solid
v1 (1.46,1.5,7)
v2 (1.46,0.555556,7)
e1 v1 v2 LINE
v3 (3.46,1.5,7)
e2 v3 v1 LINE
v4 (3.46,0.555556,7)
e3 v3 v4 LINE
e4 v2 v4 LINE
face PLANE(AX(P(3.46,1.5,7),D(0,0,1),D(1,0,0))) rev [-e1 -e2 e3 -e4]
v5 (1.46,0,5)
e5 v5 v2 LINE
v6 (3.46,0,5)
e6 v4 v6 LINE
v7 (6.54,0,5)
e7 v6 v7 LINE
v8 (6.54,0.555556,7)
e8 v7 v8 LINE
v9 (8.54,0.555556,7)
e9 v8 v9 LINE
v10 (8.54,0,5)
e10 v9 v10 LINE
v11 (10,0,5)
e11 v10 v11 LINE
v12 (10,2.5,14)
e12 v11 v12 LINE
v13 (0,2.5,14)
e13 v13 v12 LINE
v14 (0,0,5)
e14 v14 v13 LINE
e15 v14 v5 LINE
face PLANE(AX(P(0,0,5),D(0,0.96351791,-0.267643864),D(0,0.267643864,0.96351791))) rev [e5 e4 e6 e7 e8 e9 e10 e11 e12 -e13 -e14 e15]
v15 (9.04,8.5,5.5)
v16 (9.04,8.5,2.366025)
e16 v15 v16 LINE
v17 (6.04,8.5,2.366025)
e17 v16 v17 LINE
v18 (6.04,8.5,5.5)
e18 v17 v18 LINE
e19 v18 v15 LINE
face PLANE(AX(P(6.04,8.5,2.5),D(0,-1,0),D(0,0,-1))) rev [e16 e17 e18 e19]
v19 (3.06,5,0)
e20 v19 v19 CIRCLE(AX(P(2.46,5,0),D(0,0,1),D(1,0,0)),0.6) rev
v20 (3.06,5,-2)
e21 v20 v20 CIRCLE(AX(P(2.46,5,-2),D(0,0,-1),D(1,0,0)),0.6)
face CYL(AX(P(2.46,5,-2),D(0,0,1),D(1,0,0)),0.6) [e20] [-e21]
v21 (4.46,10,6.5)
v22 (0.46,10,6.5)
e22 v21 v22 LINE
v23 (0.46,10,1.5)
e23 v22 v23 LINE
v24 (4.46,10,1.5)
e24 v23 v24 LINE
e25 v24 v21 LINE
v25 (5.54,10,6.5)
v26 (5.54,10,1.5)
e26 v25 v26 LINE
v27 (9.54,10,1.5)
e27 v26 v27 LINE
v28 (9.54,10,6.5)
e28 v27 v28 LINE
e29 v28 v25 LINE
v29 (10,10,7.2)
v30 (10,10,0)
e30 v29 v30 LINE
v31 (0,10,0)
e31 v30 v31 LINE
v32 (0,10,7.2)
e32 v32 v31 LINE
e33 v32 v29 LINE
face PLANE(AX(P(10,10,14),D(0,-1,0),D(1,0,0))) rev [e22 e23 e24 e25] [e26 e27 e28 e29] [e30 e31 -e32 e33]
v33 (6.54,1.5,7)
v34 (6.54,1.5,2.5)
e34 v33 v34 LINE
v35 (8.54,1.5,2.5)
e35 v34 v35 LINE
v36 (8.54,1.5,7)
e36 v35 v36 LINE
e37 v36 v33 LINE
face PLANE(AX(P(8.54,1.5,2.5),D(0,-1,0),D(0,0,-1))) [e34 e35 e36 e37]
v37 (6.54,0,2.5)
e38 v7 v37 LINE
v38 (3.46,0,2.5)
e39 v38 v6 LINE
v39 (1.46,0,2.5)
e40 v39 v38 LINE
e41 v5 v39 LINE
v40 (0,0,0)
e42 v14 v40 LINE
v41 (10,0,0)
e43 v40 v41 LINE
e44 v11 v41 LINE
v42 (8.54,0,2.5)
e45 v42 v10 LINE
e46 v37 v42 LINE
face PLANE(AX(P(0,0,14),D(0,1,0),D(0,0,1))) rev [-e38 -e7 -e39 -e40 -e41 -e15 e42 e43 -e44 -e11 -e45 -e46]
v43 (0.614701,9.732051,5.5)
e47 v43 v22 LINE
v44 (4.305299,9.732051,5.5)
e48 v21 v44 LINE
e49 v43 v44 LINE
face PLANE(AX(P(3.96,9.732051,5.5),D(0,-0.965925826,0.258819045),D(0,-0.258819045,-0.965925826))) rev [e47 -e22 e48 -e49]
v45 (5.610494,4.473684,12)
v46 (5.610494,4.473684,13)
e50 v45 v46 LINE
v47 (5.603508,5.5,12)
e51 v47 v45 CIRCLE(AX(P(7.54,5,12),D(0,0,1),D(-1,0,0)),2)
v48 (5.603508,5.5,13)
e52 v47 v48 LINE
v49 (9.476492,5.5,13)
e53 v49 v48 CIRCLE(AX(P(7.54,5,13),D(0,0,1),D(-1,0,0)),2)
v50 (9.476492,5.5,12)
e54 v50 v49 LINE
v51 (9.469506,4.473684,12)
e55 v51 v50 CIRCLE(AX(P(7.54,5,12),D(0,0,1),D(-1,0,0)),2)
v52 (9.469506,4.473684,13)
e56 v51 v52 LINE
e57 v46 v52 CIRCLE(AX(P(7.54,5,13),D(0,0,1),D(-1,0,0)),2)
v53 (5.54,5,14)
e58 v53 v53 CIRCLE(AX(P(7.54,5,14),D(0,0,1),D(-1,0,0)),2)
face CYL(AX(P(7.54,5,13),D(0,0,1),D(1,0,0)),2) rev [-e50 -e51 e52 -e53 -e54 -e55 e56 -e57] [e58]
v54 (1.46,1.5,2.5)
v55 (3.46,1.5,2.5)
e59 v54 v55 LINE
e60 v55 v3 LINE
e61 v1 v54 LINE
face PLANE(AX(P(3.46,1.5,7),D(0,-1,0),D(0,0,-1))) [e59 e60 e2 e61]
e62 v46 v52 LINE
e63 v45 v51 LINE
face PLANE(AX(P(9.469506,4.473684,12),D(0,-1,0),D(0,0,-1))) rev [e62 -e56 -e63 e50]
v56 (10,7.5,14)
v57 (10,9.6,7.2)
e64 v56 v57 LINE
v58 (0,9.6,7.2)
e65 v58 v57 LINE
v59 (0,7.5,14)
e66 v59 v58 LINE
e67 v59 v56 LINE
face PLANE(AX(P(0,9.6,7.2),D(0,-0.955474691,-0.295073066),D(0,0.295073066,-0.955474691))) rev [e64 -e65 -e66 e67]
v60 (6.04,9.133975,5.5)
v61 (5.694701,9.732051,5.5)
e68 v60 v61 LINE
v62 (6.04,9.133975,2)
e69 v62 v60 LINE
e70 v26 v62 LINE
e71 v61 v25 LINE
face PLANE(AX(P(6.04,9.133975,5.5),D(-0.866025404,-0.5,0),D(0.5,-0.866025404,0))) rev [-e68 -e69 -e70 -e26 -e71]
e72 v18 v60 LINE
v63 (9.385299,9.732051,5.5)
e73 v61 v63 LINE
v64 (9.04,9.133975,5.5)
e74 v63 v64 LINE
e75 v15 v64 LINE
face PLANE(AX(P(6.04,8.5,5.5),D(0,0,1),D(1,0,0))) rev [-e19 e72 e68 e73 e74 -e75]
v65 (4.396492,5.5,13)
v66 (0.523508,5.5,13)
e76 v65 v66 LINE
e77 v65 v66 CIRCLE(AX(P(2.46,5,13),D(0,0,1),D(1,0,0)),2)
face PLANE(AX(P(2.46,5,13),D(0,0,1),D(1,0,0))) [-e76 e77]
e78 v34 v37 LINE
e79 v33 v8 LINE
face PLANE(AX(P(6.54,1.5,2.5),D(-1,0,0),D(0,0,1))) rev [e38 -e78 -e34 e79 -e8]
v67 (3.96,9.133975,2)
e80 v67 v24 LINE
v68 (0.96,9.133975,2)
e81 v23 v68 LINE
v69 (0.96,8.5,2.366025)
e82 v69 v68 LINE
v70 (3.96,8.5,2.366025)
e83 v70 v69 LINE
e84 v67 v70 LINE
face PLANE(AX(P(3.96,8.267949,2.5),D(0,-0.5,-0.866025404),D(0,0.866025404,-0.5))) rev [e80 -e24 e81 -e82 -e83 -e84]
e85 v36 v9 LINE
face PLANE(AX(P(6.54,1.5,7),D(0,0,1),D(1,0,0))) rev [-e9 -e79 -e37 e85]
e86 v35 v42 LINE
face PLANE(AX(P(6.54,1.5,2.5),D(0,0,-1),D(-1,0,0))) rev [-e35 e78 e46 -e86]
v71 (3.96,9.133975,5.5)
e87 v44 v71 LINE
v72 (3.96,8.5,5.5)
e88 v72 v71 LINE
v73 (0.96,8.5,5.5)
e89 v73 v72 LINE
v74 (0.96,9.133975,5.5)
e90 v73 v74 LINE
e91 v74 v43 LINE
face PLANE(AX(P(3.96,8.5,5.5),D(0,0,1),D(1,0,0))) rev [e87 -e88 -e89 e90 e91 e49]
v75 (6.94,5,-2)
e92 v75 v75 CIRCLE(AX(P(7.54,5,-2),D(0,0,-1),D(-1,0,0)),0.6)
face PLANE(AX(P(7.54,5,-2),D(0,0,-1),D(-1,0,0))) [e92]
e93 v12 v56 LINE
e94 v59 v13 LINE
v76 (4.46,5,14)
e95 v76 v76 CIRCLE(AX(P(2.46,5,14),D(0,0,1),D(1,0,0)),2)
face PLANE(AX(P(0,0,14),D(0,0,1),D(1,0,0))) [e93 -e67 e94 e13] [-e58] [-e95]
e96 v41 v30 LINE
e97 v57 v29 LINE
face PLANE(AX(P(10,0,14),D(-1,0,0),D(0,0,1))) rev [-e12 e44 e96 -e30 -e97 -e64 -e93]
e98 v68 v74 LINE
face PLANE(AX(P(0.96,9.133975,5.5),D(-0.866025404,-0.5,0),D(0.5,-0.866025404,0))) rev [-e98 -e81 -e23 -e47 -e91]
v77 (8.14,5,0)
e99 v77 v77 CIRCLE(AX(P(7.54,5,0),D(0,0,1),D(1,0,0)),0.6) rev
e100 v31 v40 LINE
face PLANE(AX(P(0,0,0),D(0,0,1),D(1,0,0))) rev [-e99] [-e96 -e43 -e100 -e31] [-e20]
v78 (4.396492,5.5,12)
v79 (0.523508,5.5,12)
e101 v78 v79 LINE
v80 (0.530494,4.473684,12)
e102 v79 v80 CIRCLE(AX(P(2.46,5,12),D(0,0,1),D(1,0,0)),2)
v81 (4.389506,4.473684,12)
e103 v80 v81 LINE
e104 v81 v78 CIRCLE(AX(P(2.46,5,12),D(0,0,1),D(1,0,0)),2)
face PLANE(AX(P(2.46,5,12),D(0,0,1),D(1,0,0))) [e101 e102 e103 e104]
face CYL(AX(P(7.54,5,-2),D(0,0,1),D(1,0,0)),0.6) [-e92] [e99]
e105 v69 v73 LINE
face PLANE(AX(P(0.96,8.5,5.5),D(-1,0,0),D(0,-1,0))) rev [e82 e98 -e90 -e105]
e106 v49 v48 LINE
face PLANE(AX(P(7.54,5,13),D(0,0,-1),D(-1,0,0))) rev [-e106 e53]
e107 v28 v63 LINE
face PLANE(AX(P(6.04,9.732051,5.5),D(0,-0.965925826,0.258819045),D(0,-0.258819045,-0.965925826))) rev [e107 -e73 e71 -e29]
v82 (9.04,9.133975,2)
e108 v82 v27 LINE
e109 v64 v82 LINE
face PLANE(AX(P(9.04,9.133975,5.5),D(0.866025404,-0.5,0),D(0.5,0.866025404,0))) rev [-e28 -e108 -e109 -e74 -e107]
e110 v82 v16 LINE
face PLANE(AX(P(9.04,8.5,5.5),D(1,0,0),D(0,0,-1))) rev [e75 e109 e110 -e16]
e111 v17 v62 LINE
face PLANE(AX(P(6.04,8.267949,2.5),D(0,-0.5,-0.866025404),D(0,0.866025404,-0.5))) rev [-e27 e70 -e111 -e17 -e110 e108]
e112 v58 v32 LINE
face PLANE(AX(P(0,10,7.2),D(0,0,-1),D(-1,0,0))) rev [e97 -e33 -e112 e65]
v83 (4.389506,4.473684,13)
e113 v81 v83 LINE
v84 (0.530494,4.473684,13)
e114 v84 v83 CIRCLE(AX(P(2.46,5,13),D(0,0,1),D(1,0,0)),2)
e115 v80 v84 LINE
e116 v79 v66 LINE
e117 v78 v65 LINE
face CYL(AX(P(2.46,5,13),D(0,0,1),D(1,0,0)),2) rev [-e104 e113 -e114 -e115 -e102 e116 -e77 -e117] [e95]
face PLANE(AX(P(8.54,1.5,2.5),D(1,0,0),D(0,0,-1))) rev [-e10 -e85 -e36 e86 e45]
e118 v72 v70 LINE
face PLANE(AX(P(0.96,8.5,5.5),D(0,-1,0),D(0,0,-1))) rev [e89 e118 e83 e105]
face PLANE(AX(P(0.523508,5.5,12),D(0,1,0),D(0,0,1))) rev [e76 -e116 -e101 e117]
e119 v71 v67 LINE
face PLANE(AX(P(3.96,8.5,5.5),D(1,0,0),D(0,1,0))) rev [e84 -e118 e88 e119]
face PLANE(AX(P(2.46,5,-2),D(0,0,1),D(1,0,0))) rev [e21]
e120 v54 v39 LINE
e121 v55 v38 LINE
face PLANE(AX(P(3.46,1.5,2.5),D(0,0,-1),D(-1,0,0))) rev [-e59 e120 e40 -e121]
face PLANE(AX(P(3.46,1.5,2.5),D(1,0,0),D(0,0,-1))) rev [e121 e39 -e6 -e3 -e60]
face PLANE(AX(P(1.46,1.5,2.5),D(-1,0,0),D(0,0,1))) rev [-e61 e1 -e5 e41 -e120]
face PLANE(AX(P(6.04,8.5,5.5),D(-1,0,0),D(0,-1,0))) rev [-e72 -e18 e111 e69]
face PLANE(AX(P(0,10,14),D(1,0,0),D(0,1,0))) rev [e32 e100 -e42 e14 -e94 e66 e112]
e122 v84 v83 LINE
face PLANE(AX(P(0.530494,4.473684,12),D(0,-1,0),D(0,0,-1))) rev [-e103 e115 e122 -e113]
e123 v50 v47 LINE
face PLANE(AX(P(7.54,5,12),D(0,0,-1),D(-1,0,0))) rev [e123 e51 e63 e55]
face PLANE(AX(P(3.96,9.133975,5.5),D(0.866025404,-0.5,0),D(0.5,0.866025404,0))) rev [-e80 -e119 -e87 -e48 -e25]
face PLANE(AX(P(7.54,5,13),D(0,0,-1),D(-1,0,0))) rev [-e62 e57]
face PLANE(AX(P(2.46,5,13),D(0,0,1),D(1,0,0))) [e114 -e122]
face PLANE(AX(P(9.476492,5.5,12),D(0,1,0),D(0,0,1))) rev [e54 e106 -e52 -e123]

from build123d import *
from build123d.topology import SkipClean

# Parameters (mm, degrees)
SKETCH_1_W          = 10
SKETCH_1_H          = 10
EXTRUDE_1_DEPTH     = 14
CUT_EXTRUDE_1_DEPTH = 20.899748742
SKETCH_3_W          = 3
SKETCH_3_H          = 3
CUT_EXTRUDE_2_DEPTH = 1.5
CHAMFER_1_SIZE      = 1
CHAMFER_1_SIZE2     = 0.267949192
CHAMFER_2_SIZE      = 1
CHAMFER_2_SIZE_2    = 1.732050808
CHAMFER_3_SIZE      = 0.5
CHAMFER_3_SIZE_2    = 0.866025404
SKETCH_4_W          = 2
SKETCH_4_H          = 4.5
CUT_EXTRUDE_3_DEPTH = 1.5
SKETCH_5_R          = 2
CUT_EXTRUDE_4_DEPTH = 1
CUT_EXTRUDE_5_DEPTH = 1
SKETCH_7_R          = 0.6
EXTRUDE_2_DEPTH     = 2


with BuildPart() as part:
    # 草图1 → 凸台-拉伸1 (new body)
    with BuildSketch(Plane.XY):
        with Locations((5, 5)):
            Rectangle(SKETCH_1_W, SKETCH_1_H)
    extrude(amount=EXTRUDE_1_DEPTH)

    # 草图2 → 切除-拉伸1 (cut, through all)
    with BuildSketch(Plane(origin=(10, 0, 0), x_dir=(0, 0, -1), z_dir=(1, 0, 0))):
        Polygon((-14, 2.5), (-14, 0), (-5, 0), align=None)
        Polygon((-14, 7.5), (-14, 10), (-7.2, 10), (-7.2, 9.6), align=None)
    extrude(amount=-CUT_EXTRUDE_1_DEPTH, mode=Mode.SUBTRACT)

    # 草图3 → 切除-拉伸2 (cut)
    with BuildSketch(Plane(origin=(0, 10, 0), x_dir=(1, 0, 0), z_dir=(0, 1, 0))):
        with Locations((2.46, -4)):
            Rectangle(SKETCH_3_W, SKETCH_3_H)
        with Locations((7.54, -4)):
            Rectangle(SKETCH_3_W, SKETCH_3_H)
    extrude(amount=-CUT_EXTRUDE_2_DEPTH, mode=Mode.SUBTRACT)

    # 倒角1
    chamfer_1_edges = [part.edges().sort_by_distance(p)[0] for p in [
        (2.46, 10, 5.5),
        (7.54, 10, 5.5),
    ]]
    chamfer_1_side = [part.faces().sort_by_distance(p)[0] for p in [
        (5, 10, 3.466666667),
    ]]
    chamfer(chamfer_1_edges, length=CHAMFER_1_SIZE, length2=CHAMFER_1_SIZE2, reference=chamfer_1_side[0])

    # 倒角2
    # the kernel refuses this chamfer: 1.732050808, 1 mm, written as the material it takes off along each edge
    with BuildSketch(Plane(origin=(0.96, 10, 2.5), x_dir=(0, 0.057893862402671484, -0.9983227437537926), z_dir=(1, 0, 0))) as chamfer_2_piece_1_section:
        Polygon((CHAMFER_2_SIZE * 0.998322743754, -CHAMFER_2_SIZE * 0.0578938624027), (-CHAMFER_2_SIZE_2 * 0.0578938623883, -CHAMFER_2_SIZE_2 * 0.998322743505), (0, 0), align=None)
    chamfer_2_piece_1 = extrude(amount=3, mode=Mode.PRIVATE)
    chamfer_2_piece_1 = split(chamfer_2_piece_1, bisect_by=Plane(origin=(2.46, 8.5, 2.161390478), z_dir=(0, 1, 0)), keep=Keep.TOP, mode=Mode.PRIVATE)
    add(chamfer_2_piece_1, mode=Mode.SUBTRACT)
    with BuildSketch(Plane(origin=(-3.520963971, 10, 2.5), x_dir=(0, 0.057893862402671484, -0.9983227437537926), z_dir=(1, 0, 0))) as chamfer_2_piece_2_section:
        Polygon((CHAMFER_2_SIZE * 0.998322743754, -CHAMFER_2_SIZE * 0.0578938624027), (-CHAMFER_2_SIZE_2 * 0.0578938623883, -CHAMFER_2_SIZE_2 * 0.998322743505), (0, 0), align=None)
    chamfer_2_piece_2 = extrude(amount=11.961927941, mode=Mode.PRIVATE)
    chamfer_2_piece_2 = split(chamfer_2_piece_2, bisect_by=Plane(origin=(7.240481985, 8.5, 2.161390478), z_dir=(0, 1, 0)), keep=Keep.TOP, mode=Mode.PRIVATE)
    chamfer_2_piece_2 = split(chamfer_2_piece_2, bisect_by=Plane(origin=(6.04, 9.440926985, 2.161390478), z_dir=(1, 0, 0)), keep=Keep.TOP, mode=Mode.PRIVATE)
    add(chamfer_2_piece_2, mode=Mode.SUBTRACT)
    with BuildSketch(Plane(origin=(1.559036029, 10, 2.5), x_dir=(0, 0.05789386240267147, -0.9983227437537926), z_dir=(1, 0, 0))) as chamfer_2_piece_3_section:
        Polygon((CHAMFER_2_SIZE * 0.998322743754, -CHAMFER_2_SIZE * 0.0578938624027), (-CHAMFER_2_SIZE_2 * 0.0578938623883, -CHAMFER_2_SIZE_2 * 0.998322743505), (0, 0), align=None)
    chamfer_2_piece_3 = extrude(amount=11.961927941, mode=Mode.PRIVATE)
    chamfer_2_piece_3 = split(chamfer_2_piece_3, bisect_by=Plane(origin=(2.759518015, 8.5, 2.161390478), z_dir=(0, 1, 0)), keep=Keep.TOP, mode=Mode.PRIVATE)
    chamfer_2_piece_3 = split(chamfer_2_piece_3, bisect_by=Plane(origin=(3.96, 9.440926985, 2.161390478), z_dir=(-1, 0, 0)), keep=Keep.TOP, mode=Mode.PRIVATE)
    add(chamfer_2_piece_3, mode=Mode.SUBTRACT)
    with BuildSketch(Plane(origin=(6.04, 10, 2.5), x_dir=(0, 0.057893862402671484, -0.9983227437537926), z_dir=(1, 0, 0))) as chamfer_2_piece_4_section:
        Polygon((CHAMFER_2_SIZE * 0.998322743754, -CHAMFER_2_SIZE * 0.0578938624027), (-CHAMFER_2_SIZE_2 * 0.0578938623883, -CHAMFER_2_SIZE_2 * 0.998322743505), (0, 0), align=None)
    chamfer_2_piece_4 = extrude(amount=3, mode=Mode.PRIVATE)
    chamfer_2_piece_4 = split(chamfer_2_piece_4, bisect_by=Plane(origin=(7.54, 8.5, 2.161390478), z_dir=(0, 1, 0)), keep=Keep.TOP, mode=Mode.PRIVATE)
    add(chamfer_2_piece_4, mode=Mode.SUBTRACT)

    # 倒角3
    # the kernel refuses this chamfer: 0.866025404, 0.5 mm, written as the material it takes off along each edge
    with BuildSketch(Plane(origin=(0.96, 10, 8.740481985), x_dir=(-0.9983227437537926, 0.057893862402669756, 3.38732848352391e-15), z_dir=(0, 0, -1))) as chamfer_3_piece_1_section:
        Polygon((CHAMFER_3_SIZE * 0.998322743754, -CHAMFER_3_SIZE * 0.0578938624027), (-CHAMFER_3_SIZE_2 * 0.0578938623883, -CHAMFER_3_SIZE_2 * 0.998322743505), (0, 0), align=None)
    chamfer_3_piece_1 = extrude(amount=9.480963971, mode=Mode.PRIVATE)
    chamfer_3_piece_1 = split(chamfer_3_piece_1, bisect_by=Plane(origin=(0.892667554, 9.405329997, 5.5), z_dir=(0, 0, -1)), keep=Keep.TOP, mode=Mode.PRIVATE)
    chamfer_3_piece_1 = split(chamfer_3_piece_1, bisect_by=Plane(origin=(0.892667554, 9.55774733, 4.849490567), z_dir=(0, -0.9659258262890682, 0.25881904510252124)), keep=Keep.TOP, mode=Mode.PRIVATE)
    add(chamfer_3_piece_1, mode=Mode.SUBTRACT)
    with BuildSketch(Plane(origin=(0.96, 10, 8.740481985), x_dir=(-0.9983227437537926, 0.057893862402669756, 3.38732848352391e-15), z_dir=(0, 0, -1))) as chamfer_3_piece_2_section:
        Polygon((CHAMFER_3_SIZE * 0.998322743754, -CHAMFER_3_SIZE * 0.0578938624027), (-CHAMFER_3_SIZE_2 * 0.0578938623883, -CHAMFER_3_SIZE_2 * 0.998322743505), (0, 0), align=None)
    chamfer_3_piece_2 = extrude(amount=9.480963971, mode=Mode.PRIVATE)
    chamfer_3_piece_2 = split(chamfer_3_piece_2, bisect_by=Plane(origin=(0.727363304, 9.931547557, 5.5), z_dir=(0, 0, 1)), keep=Keep.TOP, mode=Mode.PRIVATE)
    chamfer_3_piece_2 = split(chamfer_3_piece_2, bisect_by=Plane(origin=(0.727363304, 9.838481056, 5.897203096), z_dir=(0, 0.9659258262890682, -0.25881904510252124)), keep=Keep.TOP, mode=Mode.PRIVATE)
    add(chamfer_3_piece_2, mode=Mode.SUBTRACT)
    with BuildSketch(Plane(origin=(0.96, 10, 8.740481985), x_dir=(-0.9983227437537926, 0.057893862402669756, 3.38732848352391e-15), z_dir=(0, 0, -1))) as chamfer_3_piece_3_section:
        Polygon((CHAMFER_3_SIZE * 0.998322743754, -CHAMFER_3_SIZE * 0.0578938624027), (-CHAMFER_3_SIZE_2 * 0.0578938623883, -CHAMFER_3_SIZE_2 * 0.998322743505), (0, 0), align=None)
    chamfer_3_piece_3 = extrude(amount=9.480963971, mode=Mode.PRIVATE)
    chamfer_3_piece_3 = split(chamfer_3_piece_3, bisect_by=Plane(origin=(0.786656387, 9.751906355, 5.5), z_dir=(0, 0, -1)), keep=Keep.TOP, mode=Mode.PRIVATE)
    chamfer_3_piece_3 = split(chamfer_3_piece_3, bisect_by=Plane(origin=(0.786656387, 8.975998219, 2.091207704), z_dir=(0, 0.4999999999999566, 0.8660254037844637)), keep=Keep.TOP, mode=Mode.PRIVATE)
    chamfer_3_piece_3 = split(chamfer_3_piece_3, bisect_by=Plane(origin=(0.786656387, 9.217160881, 3.578404635), z_dir=(0, 0.9659258262890682, -0.25881904510252124)), keep=Keep.TOP, mode=Mode.PRIVATE)
    add(chamfer_3_piece_3, mode=Mode.SUBTRACT)
    with BuildSketch(Plane(origin=(3.96, 10, -0.740481985), x_dir=(0.9983227437537926, 0.057893862402669756, 3.38732848352391e-15), z_dir=(0, 0, 1))) as chamfer_3_piece_4_section:
        Polygon((CHAMFER_3_SIZE * 0.998322743754, -CHAMFER_3_SIZE * 0.0578938624027), (-CHAMFER_3_SIZE_2 * 0.0578938623883, -CHAMFER_3_SIZE_2 * 0.998322743505), (0, 0), align=None)
    chamfer_3_piece_4 = extrude(amount=9.480963971, mode=Mode.PRIVATE)
    chamfer_3_piece_4 = split(chamfer_3_piece_4, bisect_by=Plane(origin=(4.133343613, 9.751906355, 5.5), z_dir=(0, 0, -1)), keep=Keep.TOP, mode=Mode.PRIVATE)
    chamfer_3_piece_4 = split(chamfer_3_piece_4, bisect_by=Plane(origin=(4.133343613, 8.975998219, 2.091207704), z_dir=(0, 0.4999999999999566, 0.8660254037844637)), keep=Keep.TOP, mode=Mode.PRIVATE)
    chamfer_3_piece_4 = split(chamfer_3_piece_4, bisect_by=Plane(origin=(4.133343613, 9.217160881, 3.578404635), z_dir=(0, 0.9659258262890682, -0.25881904510252124)), keep=Keep.TOP, mode=Mode.PRIVATE)
    add(chamfer_3_piece_4, mode=Mode.SUBTRACT)
    with BuildSketch(Plane(origin=(3.96, 10, -0.740481985), x_dir=(0.9983227437537926, 0.057893862402669756, 3.38732848352391e-15), z_dir=(0, 0, 1))) as chamfer_3_piece_5_section:
        Polygon((CHAMFER_3_SIZE * 0.998322743754, -CHAMFER_3_SIZE * 0.0578938624027), (-CHAMFER_3_SIZE_2 * 0.0578938623883, -CHAMFER_3_SIZE_2 * 0.998322743505), (0, 0), align=None)
    chamfer_3_piece_5 = extrude(amount=9.480963971, mode=Mode.PRIVATE)
    chamfer_3_piece_5 = split(chamfer_3_piece_5, bisect_by=Plane(origin=(4.027332446, 9.405329997, 5.5), z_dir=(0, 0, -1)), keep=Keep.TOP, mode=Mode.PRIVATE)
    chamfer_3_piece_5 = split(chamfer_3_piece_5, bisect_by=Plane(origin=(4.027332446, 9.55774733, 4.849490567), z_dir=(0, -0.9659258262890682, 0.25881904510252124)), keep=Keep.TOP, mode=Mode.PRIVATE)
    add(chamfer_3_piece_5, mode=Mode.SUBTRACT)
    with BuildSketch(Plane(origin=(3.96, 10, -0.740481985), x_dir=(0.9983227437537926, 0.057893862402669756, 3.38732848352391e-15), z_dir=(0, 0, 1))) as chamfer_3_piece_6_section:
        Polygon((CHAMFER_3_SIZE * 0.998322743754, -CHAMFER_3_SIZE * 0.0578938624027), (-CHAMFER_3_SIZE_2 * 0.0578938623883, -CHAMFER_3_SIZE_2 * 0.998322743505), (0, 0), align=None)
    chamfer_3_piece_6 = extrude(amount=9.480963971, mode=Mode.PRIVATE)
    chamfer_3_piece_6 = split(chamfer_3_piece_6, bisect_by=Plane(origin=(4.192636696, 9.931547557, 5.5), z_dir=(0, 0, 1)), keep=Keep.TOP, mode=Mode.PRIVATE)
    chamfer_3_piece_6 = split(chamfer_3_piece_6, bisect_by=Plane(origin=(4.192636696, 9.838481056, 5.897203096), z_dir=(0, 0.9659258262890682, -0.25881904510252124)), keep=Keep.TOP, mode=Mode.PRIVATE)
    add(chamfer_3_piece_6, mode=Mode.SUBTRACT)
    with BuildSketch(Plane(origin=(6.04, 10, 8.740481985), x_dir=(-0.9983227437537926, 0.057893862402669756, 3.455429323526044e-15), z_dir=(0, 0, -1))) as chamfer_3_piece_7_section:
        Polygon((CHAMFER_3_SIZE * 0.998322743754, -CHAMFER_3_SIZE * 0.0578938624027), (-CHAMFER_3_SIZE_2 * 0.0578938623883, -CHAMFER_3_SIZE_2 * 0.998322743505), (0, 0), align=None)
    chamfer_3_piece_7 = extrude(amount=9.480963971, mode=Mode.PRIVATE)
    chamfer_3_piece_7 = split(chamfer_3_piece_7, bisect_by=Plane(origin=(5.972667554, 9.55774733, 4.849490567), z_dir=(0, -0.9659258262890682, 0.25881904510252124)), keep=Keep.TOP, mode=Mode.PRIVATE)
    chamfer_3_piece_7 = split(chamfer_3_piece_7, bisect_by=Plane(origin=(5.972667554, 9.405329997, 5.5), z_dir=(0, 0, -1)), keep=Keep.TOP, mode=Mode.PRIVATE)
    add(chamfer_3_piece_7, mode=Mode.SUBTRACT)
    with BuildSketch(Plane(origin=(6.04, 10, 8.740481985), x_dir=(-0.9983227437537926, 0.057893862402669756, 3.455429323526044e-15), z_dir=(0, 0, -1))) as chamfer_3_piece_8_section:
        Polygon((CHAMFER_3_SIZE * 0.998322743754, -CHAMFER_3_SIZE * 0.0578938624027), (-CHAMFER_3_SIZE_2 * 0.0578938623883, -CHAMFER_3_SIZE_2 * 0.998322743505), (0, 0), align=None)
    chamfer_3_piece_8 = extrude(amount=9.480963971, mode=Mode.PRIVATE)
    chamfer_3_piece_8 = split(chamfer_3_piece_8, bisect_by=Plane(origin=(5.807363304, 9.838481056, 5.897203096), z_dir=(0, 0.9659258262890682, -0.25881904510252124)), keep=Keep.TOP, mode=Mode.PRIVATE)
    chamfer_3_piece_8 = split(chamfer_3_piece_8, bisect_by=Plane(origin=(5.807363304, 9.931547557, 5.5), z_dir=(0, 0, 1)), keep=Keep.TOP, mode=Mode.PRIVATE)
    add(chamfer_3_piece_8, mode=Mode.SUBTRACT)
    with BuildSketch(Plane(origin=(6.04, 10, 8.740481985), x_dir=(-0.9983227437537926, 0.057893862402669756, 3.455429323526044e-15), z_dir=(0, 0, -1))) as chamfer_3_piece_9_section:
        Polygon((CHAMFER_3_SIZE * 0.998322743754, -CHAMFER_3_SIZE * 0.0578938624027), (-CHAMFER_3_SIZE_2 * 0.0578938623883, -CHAMFER_3_SIZE_2 * 0.998322743505), (0, 0), align=None)
    chamfer_3_piece_9 = extrude(amount=9.480963971, mode=Mode.PRIVATE)
    chamfer_3_piece_9 = split(chamfer_3_piece_9, bisect_by=Plane(origin=(5.866656387, 9.217160881, 3.578404635), z_dir=(0, 0.9659258262890682, -0.25881904510252124)), keep=Keep.TOP, mode=Mode.PRIVATE)
    chamfer_3_piece_9 = split(chamfer_3_piece_9, bisect_by=Plane(origin=(5.866656387, 9.751906355, 5.5), z_dir=(0, 0, -1)), keep=Keep.TOP, mode=Mode.PRIVATE)
    chamfer_3_piece_9 = split(chamfer_3_piece_9, bisect_by=Plane(origin=(5.866656387, 8.975998219, 2.091207704), z_dir=(0, 0.4999999999999566, 0.8660254037844637)), keep=Keep.TOP, mode=Mode.PRIVATE)
    add(chamfer_3_piece_9, mode=Mode.SUBTRACT)
    with BuildSketch(Plane(origin=(9.04, 10, -0.740481985), x_dir=(0.9983227437537927, 0.05789386240266987, 3.455429323526051e-15), z_dir=(0, 0, 1))) as chamfer_3_piece_10_section:
        Polygon((CHAMFER_3_SIZE * 0.998322743754, -CHAMFER_3_SIZE * 0.0578938624027), (-CHAMFER_3_SIZE_2 * 0.0578938623883, -CHAMFER_3_SIZE_2 * 0.998322743505), (0, 0), align=None)
    chamfer_3_piece_10 = extrude(amount=9.480963971, mode=Mode.PRIVATE)
    chamfer_3_piece_10 = split(chamfer_3_piece_10, bisect_by=Plane(origin=(9.213343613, 9.751906355, 5.5), z_dir=(0, 0, -1)), keep=Keep.TOP, mode=Mode.PRIVATE)
    chamfer_3_piece_10 = split(chamfer_3_piece_10, bisect_by=Plane(origin=(9.213343613, 8.975998219, 2.091207704), z_dir=(0, 0.4999999999999566, 0.8660254037844637)), keep=Keep.TOP, mode=Mode.PRIVATE)
    chamfer_3_piece_10 = split(chamfer_3_piece_10, bisect_by=Plane(origin=(9.213343613, 9.217160881, 3.578404635), z_dir=(0, 0.9659258262890682, -0.25881904510252124)), keep=Keep.TOP, mode=Mode.PRIVATE)
    add(chamfer_3_piece_10, mode=Mode.SUBTRACT)
    with BuildSketch(Plane(origin=(9.04, 10, -0.740481985), x_dir=(0.9983227437537927, 0.05789386240266987, 3.455429323526051e-15), z_dir=(0, 0, 1))) as chamfer_3_piece_11_section:
        Polygon((CHAMFER_3_SIZE * 0.998322743754, -CHAMFER_3_SIZE * 0.0578938624027), (-CHAMFER_3_SIZE_2 * 0.0578938623883, -CHAMFER_3_SIZE_2 * 0.998322743505), (0, 0), align=None)
    chamfer_3_piece_11 = extrude(amount=9.480963971, mode=Mode.PRIVATE)
    chamfer_3_piece_11 = split(chamfer_3_piece_11, bisect_by=Plane(origin=(9.107332446, 9.405329997, 5.5), z_dir=(0, 0, -1)), keep=Keep.TOP, mode=Mode.PRIVATE)
    chamfer_3_piece_11 = split(chamfer_3_piece_11, bisect_by=Plane(origin=(9.107332446, 9.55774733, 4.849490567), z_dir=(0, -0.9659258262890682, 0.25881904510252124)), keep=Keep.TOP, mode=Mode.PRIVATE)
    add(chamfer_3_piece_11, mode=Mode.SUBTRACT)
    with BuildSketch(Plane(origin=(9.04, 10, -0.740481985), x_dir=(0.9983227437537927, 0.05789386240266987, 3.455429323526051e-15), z_dir=(0, 0, 1))) as chamfer_3_piece_12_section:
        Polygon((CHAMFER_3_SIZE * 0.998322743754, -CHAMFER_3_SIZE * 0.0578938624027), (-CHAMFER_3_SIZE_2 * 0.0578938623883, -CHAMFER_3_SIZE_2 * 0.998322743505), (0, 0), align=None)
    chamfer_3_piece_12 = extrude(amount=9.480963971, mode=Mode.PRIVATE)
    chamfer_3_piece_12 = split(chamfer_3_piece_12, bisect_by=Plane(origin=(9.272636696, 9.931547557, 5.5), z_dir=(0, 0, 1)), keep=Keep.TOP, mode=Mode.PRIVATE)
    chamfer_3_piece_12 = split(chamfer_3_piece_12, bisect_by=Plane(origin=(9.272636696, 9.838481056, 5.897203096), z_dir=(0, 0.9659258262890682, -0.25881904510252124)), keep=Keep.TOP, mode=Mode.PRIVATE)
    add(chamfer_3_piece_12, mode=Mode.SUBTRACT)

    # 草图4 → 切除-拉伸3 (cut)
    with BuildSketch(Plane.XZ):
        with Locations((7.54, 4.75)):
            Rectangle(SKETCH_4_W, SKETCH_4_H)
        with Locations((2.46, 4.75)):
            Rectangle(SKETCH_4_W, SKETCH_4_H)
    extrude(amount=-CUT_EXTRUDE_3_DEPTH, mode=Mode.SUBTRACT)

    # 草图5 → 切除-拉伸4 (cut)
    with BuildSketch(Plane.XY.offset(14)):
        with Locations((2.46, 5)):
            Circle(SKETCH_5_R)
        with Locations(Location((7.54, 5, 0), (0, 0, 180))):
            Circle(SKETCH_5_R)
    extrude(amount=-CUT_EXTRUDE_4_DEPTH, mode=Mode.SUBTRACT)

    # 草图6 → 切除-拉伸5 (cut)
    with SkipClean():  # the faces are left unmerged after this step: merging them gives an invalid solid
        with BuildSketch(Plane.XY.offset(13)):
            with BuildLine():
                Line((0.523508327, 5.5), (4.396491673, 5.5))
                ThreePointArc((4.396491673, 5.5), (4.459953667, 4.986386343), (4.389505556, 4.473684211))
                Line((4.389505556, 4.473684211), (0.530494444, 4.473684211))
                ThreePointArc((0.530494444, 4.473684211), (0.460046333, 4.986386343), (0.523508327, 5.5))
            make_face()
            with BuildLine():
                Line((9.469505556, 4.473684211), (5.610494444, 4.473684211))
                ThreePointArc((5.610494444, 4.473684211), (5.540046333, 4.986386343), (5.603508327, 5.5))
                Line((5.603508327, 5.5), (9.476491673, 5.5))
                ThreePointArc((9.476491673, 5.5), (9.539953667, 4.986386343), (9.469505556, 4.473684211))
            make_face()
        extrude(amount=-CUT_EXTRUDE_5_DEPTH, mode=Mode.SUBTRACT)

    # 草图7 → 凸台-拉伸2 (add)
    with SkipClean():  # the faces are left unmerged after this step: merging them gives an invalid solid
        with BuildSketch(Plane(origin=(0, 0, 0), x_dir=(-1, 0, 0), z_dir=(0, 0, -1))):
            with Locations(Location((-7.54, 5, 0), (0, 0, 180))):
                Circle(SKETCH_7_R)
            with Locations(Location((-2.46, 5, 0), (0, 0, 180))):
                Circle(SKETCH_7_R)
        extrude(amount=EXTRUDE_2_DEPTH)


solid = part.part
